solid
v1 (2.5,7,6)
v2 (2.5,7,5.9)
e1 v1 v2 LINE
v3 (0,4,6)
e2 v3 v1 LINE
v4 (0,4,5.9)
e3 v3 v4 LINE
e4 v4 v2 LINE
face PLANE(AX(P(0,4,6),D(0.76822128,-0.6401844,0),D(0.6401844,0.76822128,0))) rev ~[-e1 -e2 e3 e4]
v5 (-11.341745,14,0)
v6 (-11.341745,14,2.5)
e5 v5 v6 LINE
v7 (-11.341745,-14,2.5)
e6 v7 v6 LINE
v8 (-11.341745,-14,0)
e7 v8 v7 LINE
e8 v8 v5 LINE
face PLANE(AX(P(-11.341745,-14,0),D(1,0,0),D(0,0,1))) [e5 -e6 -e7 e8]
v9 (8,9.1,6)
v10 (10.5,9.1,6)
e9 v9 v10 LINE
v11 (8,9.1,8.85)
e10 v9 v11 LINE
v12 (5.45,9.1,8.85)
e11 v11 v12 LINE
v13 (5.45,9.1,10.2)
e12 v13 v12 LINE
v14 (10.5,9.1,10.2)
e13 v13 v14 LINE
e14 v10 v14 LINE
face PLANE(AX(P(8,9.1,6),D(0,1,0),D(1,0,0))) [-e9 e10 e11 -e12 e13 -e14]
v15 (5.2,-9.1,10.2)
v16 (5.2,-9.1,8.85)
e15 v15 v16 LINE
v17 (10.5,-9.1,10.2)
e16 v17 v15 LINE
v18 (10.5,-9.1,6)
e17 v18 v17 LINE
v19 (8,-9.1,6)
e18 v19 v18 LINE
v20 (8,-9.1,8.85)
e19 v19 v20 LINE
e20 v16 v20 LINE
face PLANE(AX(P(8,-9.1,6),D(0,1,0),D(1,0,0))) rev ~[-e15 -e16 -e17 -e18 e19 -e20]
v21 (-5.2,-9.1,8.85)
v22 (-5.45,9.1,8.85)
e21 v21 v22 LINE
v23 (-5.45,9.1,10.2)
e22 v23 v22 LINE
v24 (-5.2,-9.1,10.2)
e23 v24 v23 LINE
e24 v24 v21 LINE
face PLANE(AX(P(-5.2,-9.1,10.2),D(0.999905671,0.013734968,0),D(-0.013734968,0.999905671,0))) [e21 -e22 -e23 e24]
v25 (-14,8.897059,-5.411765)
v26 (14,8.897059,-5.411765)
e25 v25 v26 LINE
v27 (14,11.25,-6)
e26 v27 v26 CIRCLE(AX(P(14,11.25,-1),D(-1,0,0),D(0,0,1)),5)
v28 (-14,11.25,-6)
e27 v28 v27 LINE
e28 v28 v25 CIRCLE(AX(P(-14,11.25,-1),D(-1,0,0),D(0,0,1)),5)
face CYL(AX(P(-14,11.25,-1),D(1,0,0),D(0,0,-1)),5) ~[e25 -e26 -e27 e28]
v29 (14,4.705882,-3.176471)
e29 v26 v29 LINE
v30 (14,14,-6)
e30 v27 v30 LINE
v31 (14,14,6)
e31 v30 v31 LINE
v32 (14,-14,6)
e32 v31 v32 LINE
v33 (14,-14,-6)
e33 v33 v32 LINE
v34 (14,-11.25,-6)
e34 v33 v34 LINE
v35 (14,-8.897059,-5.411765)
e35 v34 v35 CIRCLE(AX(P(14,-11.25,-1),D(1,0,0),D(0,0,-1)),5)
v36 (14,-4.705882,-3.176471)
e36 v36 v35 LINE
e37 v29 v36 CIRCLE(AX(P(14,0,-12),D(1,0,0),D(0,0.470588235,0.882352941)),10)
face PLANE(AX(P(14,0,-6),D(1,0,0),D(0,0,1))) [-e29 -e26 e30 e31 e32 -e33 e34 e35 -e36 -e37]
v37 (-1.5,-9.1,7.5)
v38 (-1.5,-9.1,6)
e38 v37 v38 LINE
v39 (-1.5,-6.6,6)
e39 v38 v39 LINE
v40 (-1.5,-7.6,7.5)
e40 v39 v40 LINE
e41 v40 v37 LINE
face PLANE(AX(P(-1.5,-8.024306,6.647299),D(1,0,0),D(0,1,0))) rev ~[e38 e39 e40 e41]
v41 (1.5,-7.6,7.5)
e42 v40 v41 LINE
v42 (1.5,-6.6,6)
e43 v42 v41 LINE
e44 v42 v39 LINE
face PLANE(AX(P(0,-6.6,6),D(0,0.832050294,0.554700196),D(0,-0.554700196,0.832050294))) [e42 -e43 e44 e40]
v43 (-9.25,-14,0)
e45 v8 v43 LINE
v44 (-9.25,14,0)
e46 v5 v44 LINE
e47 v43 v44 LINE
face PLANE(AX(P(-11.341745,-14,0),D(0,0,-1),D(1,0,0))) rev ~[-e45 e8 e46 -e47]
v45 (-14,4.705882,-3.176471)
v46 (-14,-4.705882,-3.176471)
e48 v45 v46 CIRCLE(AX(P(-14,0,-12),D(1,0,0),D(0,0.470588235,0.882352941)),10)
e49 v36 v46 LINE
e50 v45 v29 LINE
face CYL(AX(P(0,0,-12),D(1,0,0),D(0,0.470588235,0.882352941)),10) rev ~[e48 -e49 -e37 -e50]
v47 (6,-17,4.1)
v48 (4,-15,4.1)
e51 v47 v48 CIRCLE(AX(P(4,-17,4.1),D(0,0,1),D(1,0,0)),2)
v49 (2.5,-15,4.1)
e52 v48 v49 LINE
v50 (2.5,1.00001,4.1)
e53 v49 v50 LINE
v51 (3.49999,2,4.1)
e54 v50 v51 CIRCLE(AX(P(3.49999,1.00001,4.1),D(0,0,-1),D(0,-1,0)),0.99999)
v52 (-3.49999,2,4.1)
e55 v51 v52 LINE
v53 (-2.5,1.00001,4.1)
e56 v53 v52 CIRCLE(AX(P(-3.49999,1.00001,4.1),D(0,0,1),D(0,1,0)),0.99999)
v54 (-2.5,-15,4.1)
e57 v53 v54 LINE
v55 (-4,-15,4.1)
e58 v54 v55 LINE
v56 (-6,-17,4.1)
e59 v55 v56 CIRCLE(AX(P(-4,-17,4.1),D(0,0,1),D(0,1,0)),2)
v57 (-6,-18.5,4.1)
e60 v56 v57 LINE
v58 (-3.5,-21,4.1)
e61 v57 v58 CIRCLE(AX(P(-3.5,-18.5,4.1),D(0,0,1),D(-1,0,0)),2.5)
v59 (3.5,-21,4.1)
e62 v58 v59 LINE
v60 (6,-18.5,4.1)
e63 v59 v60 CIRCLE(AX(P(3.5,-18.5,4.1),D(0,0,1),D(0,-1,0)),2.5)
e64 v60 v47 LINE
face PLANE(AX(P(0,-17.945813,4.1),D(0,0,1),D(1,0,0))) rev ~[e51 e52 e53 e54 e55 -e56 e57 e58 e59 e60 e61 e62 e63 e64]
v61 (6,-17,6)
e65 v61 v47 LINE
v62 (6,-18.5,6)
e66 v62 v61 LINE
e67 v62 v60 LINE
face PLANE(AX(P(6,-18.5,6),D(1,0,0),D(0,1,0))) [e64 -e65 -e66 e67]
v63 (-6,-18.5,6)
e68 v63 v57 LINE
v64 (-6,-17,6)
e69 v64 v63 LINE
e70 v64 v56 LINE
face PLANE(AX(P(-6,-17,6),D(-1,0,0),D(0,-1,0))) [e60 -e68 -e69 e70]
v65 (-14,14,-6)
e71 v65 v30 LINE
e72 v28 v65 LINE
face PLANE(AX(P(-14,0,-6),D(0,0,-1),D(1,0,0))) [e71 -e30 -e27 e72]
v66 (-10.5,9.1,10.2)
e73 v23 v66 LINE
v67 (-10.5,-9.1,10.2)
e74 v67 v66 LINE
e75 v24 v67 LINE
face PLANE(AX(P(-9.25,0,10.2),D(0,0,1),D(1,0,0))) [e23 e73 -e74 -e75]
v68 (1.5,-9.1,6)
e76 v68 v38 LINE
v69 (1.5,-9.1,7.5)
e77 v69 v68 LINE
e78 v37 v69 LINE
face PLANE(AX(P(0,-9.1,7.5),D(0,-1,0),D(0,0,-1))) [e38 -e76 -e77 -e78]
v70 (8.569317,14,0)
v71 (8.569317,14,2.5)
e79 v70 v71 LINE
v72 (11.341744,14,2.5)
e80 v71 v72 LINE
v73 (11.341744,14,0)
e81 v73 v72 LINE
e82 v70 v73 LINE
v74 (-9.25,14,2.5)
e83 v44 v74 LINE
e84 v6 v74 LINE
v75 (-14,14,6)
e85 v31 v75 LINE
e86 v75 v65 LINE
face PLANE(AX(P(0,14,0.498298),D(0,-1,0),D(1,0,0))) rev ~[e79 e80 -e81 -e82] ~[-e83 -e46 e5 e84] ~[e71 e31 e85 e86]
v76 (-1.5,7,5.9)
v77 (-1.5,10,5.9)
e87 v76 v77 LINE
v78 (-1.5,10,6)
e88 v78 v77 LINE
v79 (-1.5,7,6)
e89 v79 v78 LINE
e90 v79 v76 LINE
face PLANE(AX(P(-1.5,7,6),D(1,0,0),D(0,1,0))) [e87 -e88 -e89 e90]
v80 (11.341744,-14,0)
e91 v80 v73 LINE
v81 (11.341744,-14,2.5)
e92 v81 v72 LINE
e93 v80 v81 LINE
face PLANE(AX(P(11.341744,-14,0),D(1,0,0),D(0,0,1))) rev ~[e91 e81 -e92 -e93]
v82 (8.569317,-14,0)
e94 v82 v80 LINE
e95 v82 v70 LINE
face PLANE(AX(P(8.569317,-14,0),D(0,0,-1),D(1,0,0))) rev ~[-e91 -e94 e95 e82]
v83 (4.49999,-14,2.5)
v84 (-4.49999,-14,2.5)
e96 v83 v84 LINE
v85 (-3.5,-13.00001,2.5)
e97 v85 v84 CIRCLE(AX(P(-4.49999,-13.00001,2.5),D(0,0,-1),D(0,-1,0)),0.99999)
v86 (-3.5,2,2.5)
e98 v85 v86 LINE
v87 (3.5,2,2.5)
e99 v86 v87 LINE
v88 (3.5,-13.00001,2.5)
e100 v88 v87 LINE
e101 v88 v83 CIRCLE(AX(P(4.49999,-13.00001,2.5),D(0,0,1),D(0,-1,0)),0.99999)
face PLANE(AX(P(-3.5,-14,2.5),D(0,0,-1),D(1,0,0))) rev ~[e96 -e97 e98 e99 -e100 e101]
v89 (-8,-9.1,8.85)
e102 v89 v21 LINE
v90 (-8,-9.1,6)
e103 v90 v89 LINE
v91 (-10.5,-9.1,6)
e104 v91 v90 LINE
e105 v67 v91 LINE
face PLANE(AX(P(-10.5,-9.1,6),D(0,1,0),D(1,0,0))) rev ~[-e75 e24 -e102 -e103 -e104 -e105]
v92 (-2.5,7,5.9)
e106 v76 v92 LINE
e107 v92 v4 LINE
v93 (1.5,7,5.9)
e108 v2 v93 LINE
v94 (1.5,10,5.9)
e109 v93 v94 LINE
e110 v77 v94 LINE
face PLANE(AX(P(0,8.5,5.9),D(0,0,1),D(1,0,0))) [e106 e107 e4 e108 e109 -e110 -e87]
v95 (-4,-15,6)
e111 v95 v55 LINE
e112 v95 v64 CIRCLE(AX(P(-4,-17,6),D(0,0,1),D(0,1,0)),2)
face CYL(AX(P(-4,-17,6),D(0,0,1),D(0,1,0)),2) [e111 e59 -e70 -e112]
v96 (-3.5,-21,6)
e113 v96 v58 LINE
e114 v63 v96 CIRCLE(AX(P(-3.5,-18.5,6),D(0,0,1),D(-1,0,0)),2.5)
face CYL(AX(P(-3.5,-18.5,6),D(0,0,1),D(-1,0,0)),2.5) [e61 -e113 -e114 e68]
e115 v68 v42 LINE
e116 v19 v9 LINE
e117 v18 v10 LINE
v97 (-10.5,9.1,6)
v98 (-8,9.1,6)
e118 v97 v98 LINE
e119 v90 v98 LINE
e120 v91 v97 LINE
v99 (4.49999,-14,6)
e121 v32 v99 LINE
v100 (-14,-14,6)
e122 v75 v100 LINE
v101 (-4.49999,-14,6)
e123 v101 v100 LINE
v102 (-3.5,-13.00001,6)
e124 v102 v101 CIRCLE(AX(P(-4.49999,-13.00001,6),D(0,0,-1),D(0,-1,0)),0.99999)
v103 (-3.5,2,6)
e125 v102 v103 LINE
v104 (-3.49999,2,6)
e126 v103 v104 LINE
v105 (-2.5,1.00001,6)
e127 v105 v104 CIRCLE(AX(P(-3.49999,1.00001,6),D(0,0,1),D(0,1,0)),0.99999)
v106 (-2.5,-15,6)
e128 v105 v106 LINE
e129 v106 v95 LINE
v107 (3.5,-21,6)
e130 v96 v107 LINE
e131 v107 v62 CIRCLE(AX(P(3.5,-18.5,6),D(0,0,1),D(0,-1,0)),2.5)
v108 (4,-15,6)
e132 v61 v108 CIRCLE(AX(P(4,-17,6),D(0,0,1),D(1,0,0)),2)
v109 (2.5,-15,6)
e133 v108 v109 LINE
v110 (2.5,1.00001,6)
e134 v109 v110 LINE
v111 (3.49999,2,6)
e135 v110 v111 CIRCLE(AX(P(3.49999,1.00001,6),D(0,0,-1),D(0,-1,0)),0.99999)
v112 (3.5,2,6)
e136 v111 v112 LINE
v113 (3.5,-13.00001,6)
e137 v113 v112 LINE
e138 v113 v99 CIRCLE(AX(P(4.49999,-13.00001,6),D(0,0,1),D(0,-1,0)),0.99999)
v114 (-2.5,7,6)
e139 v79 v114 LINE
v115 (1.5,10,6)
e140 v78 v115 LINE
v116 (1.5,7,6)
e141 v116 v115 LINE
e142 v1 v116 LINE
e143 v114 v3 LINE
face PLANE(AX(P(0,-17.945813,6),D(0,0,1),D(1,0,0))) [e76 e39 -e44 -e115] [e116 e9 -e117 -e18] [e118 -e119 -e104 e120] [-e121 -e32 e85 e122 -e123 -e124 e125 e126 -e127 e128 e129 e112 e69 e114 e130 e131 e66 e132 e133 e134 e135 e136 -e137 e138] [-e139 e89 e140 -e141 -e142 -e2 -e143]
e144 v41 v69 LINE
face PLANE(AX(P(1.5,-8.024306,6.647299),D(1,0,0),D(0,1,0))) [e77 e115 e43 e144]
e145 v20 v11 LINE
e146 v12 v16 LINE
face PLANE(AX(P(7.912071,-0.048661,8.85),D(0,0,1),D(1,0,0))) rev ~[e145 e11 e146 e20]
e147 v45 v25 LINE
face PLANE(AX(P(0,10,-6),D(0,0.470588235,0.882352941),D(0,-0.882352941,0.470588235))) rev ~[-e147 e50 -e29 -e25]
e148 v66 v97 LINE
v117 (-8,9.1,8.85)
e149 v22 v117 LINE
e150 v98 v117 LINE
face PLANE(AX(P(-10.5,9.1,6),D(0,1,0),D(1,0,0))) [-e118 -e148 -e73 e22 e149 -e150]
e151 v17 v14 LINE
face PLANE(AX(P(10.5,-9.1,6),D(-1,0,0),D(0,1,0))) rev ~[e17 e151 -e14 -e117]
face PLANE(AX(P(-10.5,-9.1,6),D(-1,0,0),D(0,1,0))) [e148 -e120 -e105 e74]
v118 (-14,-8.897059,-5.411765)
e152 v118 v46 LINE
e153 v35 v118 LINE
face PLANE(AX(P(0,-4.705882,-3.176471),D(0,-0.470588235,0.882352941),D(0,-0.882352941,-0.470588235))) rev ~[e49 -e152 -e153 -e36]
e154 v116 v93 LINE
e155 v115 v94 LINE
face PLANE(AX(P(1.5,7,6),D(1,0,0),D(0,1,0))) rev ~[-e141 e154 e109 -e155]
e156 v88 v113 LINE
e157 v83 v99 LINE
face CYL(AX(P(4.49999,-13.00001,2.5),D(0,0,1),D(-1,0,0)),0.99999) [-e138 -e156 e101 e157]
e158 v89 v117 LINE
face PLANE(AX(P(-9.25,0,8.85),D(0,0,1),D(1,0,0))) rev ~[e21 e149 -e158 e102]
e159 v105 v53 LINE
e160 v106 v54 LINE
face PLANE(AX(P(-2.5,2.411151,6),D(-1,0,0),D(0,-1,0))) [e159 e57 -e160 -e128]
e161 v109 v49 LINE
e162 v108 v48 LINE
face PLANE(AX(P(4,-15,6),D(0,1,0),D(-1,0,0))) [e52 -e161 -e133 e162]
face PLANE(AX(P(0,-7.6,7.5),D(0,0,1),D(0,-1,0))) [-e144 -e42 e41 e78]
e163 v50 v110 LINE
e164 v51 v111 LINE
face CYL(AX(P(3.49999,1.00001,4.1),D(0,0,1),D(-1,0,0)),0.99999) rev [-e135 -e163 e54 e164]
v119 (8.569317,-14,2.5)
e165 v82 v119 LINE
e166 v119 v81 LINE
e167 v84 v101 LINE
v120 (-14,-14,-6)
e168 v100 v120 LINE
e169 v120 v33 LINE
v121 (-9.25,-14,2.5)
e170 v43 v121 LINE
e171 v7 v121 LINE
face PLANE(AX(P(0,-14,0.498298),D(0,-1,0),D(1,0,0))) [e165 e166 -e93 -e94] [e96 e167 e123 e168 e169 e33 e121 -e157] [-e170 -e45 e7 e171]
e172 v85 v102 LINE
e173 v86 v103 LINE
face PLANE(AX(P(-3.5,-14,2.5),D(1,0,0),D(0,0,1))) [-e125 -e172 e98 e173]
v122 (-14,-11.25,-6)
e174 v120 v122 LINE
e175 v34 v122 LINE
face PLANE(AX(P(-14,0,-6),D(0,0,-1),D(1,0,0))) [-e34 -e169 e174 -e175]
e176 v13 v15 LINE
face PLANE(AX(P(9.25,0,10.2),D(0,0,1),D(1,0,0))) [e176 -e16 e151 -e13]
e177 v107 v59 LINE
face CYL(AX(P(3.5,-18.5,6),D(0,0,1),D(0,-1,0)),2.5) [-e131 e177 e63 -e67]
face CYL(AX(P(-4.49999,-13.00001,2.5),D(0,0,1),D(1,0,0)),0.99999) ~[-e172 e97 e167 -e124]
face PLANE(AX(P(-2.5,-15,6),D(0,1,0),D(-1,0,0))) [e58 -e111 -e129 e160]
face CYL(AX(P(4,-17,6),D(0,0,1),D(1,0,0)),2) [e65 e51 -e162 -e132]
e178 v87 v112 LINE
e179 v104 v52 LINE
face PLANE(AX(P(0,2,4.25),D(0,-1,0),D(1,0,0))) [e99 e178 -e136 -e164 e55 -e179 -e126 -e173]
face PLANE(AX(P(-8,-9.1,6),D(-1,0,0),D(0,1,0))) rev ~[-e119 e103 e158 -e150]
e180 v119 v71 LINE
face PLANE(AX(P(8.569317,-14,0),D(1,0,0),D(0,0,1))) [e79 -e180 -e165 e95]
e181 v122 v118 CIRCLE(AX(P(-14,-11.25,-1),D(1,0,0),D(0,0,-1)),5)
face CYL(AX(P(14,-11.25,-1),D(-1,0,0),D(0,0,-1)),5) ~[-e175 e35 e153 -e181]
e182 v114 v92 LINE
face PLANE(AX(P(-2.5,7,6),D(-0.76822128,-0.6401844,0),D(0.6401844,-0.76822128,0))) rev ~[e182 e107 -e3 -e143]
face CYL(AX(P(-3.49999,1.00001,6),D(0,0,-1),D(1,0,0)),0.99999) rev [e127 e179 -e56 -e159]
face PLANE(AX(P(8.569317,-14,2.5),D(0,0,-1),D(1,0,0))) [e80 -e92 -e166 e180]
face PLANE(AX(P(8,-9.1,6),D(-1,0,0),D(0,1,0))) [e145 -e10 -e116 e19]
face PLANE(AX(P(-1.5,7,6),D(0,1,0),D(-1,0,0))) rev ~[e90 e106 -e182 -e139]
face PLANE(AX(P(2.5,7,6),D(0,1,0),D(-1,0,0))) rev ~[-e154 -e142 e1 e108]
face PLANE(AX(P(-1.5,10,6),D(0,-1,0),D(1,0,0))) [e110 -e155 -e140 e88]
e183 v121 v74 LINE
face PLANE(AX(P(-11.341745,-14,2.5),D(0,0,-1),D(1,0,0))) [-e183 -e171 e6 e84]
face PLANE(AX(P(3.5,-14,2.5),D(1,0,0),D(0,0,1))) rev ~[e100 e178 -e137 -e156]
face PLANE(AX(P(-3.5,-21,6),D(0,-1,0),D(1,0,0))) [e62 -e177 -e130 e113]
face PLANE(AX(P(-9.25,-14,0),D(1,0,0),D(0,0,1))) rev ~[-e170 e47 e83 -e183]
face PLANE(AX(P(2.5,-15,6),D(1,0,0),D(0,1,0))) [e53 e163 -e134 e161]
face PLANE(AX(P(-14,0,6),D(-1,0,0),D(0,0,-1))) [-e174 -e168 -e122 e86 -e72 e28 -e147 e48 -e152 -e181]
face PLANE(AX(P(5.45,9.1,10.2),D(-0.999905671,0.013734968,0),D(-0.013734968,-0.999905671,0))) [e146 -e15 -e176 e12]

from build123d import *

# Parameters (mm, degrees)
F1_DEPTH  = 14
F3_W      = 7
F3_H      = 3.5
F4_DEPTH  = 16
F5_W      = 5
F5_H      = 0.4111507442
F5_H_2    = 17
F6_DEPTH  = 1.9
F8_R      = 0.99999
F10_DEPTH = 1.5
F11_W     = 2.5
F11_H     = 18.2
F12_DEPTH = 4.2
F13_W     = 2.5
F13_H     = 18.2
F14_DEPTH = 1.35
F15_W     = 3
F15_H     = 3
F16_DEPTH = 0.1
F17_DEPTH = 15
F18_R     = 5
F19_W     = 2.0917450339
F19_H     = 2.5
F20_DEPTH = 28.001
F19_W_2   = 2.772427164
F21_DEPTH = 28.001


# Not quite as in the source:
# - a fillet or chamfer is up to 0.001 mm smaller than in the source, because OpenCascade refuses the exact size
# - the program builds the solid bodies; features that only make, move or delete a surface that nothing else refers to are left out


with BuildPart() as f1:
    # F0 (on Front) → F1 (new body, symmetric)
    with BuildSketch(Plane.XZ):
        with BuildLine():
            Line((10, -6), (14, -6))
            Line((14, -6), (14, 6))
            Line((14, 6), (-14, 6))
            Line((-14, 6), (-14, -6))
            Line((-14, -6), (-10, -6))
            Line((-10, -6), (-4.7058823529, -3.1764705882))
            ThreePointArc((-4.7058823529, -3.1764705882), (0, -2), (4.7058823529, -3.1764705882))
            Line((4.7058823529, -3.1764705882), (10, -6))
        make_face()
        with BuildLine():
            Line((-10, -6), (10, -6))
            Line((10, -6), (4.7058823529, -3.1764705882))
            ThreePointArc((4.7058823529, -3.1764705882), (0, -2), (-4.7058823529, -3.1764705882))
            Line((-4.7058823529, -3.1764705882), (-10, -6))
        make_face()
    extrude(amount=F1_DEPTH, both=True)

    # F3 (on face) → F4 (cut)
    with BuildSketch(Plane.XZ.offset(14)):
        with Locations((0, 4.25)):
            Rectangle(F3_W, F3_H)
    extrude(amount=-F4_DEPTH, mode=Mode.SUBTRACT)

    # F5 (on face) → F6 (join)
    with BuildSketch(Plane.XY.offset(6)):
        with BuildLine():
            Line((2.5, -15), (-2.5, -15))
            Line((-2.5, -15), (-4, -15))
            ThreePointArc((-4, -15), (-5.4142135624, -15.5857864376), (-6, -17))
            Line((-6, -17), (-6, -18.5))
            ThreePointArc((-6, -18.5), (-5.267766953, -20.267766953), (-3.5, -21))
            Line((-3.5, -21), (3.5, -21))
            ThreePointArc((3.5, -21), (5.267766953, -20.267766953), (6, -18.5))
            Line((6, -18.5), (6, -17))
            ThreePointArc((6, -17), (5.4142135624, -15.5857864376), (4, -15))
            Line((4, -15), (2.5, -15))
        make_face()
        with Locations((0, 2.2055753721)):
            Rectangle(F5_W, F5_H)
        with Locations((0, -6.5)):
            Rectangle(F5_W, F5_H_2)
    extrude(amount=-F6_DEPTH)

    # F7: union 

    # F8 (radius 1 in the source; OpenCascade refuses exactly that, so slightly less here)
    f8_edges = [f1.edges().sort_by_distance(p)[0] for p in [
        (-3.5, -14, 4.25),
        (3.5, -14, 4.25),
        (2.5, 2, 5.05),
        (-2.5, 2, 5.05),
    ]]
    fillet(f8_edges, radius=F8_R)

    # F9 (on Right) → F10 (join, symmetric)
    with BuildSketch(Plane.YZ):
        Polygon((-6.6, 6), (-7.6, 7.5), (-9.1, 7.5), (-9.1, 6), align=None)
    extrude(amount=F10_DEPTH, both=True)

    # F11 (on face) → F12 (join)
    with BuildSketch(Plane.XY.offset(6)):
        with Locations((-9.25, 0)):
            Rectangle(F11_W, F11_H)
        with Locations((9.25, 0)):
            Rectangle(F11_W, F11_H)
    extrude(amount=F12_DEPTH)

    # F13 (on face) → F14 (join)
    with BuildSketch(Plane.XY.offset(10.2)):
        with Locations((-9.25, 0)):
            Rectangle(F13_W, F13_H)
        Polygon((-5.45, 9.1), (-8, 9.1), (-8, -9.1), (-5.2, -9.1), align=None)
        Polygon((5.45, 9.1), (5.2, -9.1), (10.5, -9.1), (10.5, 9.1), align=None)
    extrude(amount=-F14_DEPTH)

    # F15 (on face) → F16 (cut)
    with BuildSketch(Plane.XY.offset(6)):
        with Locations((0, 8.5)):
            Rectangle(F15_W, F15_H)
        Polygon((2.5, 7), (1.5, 7), (-1.5, 7), (-2.5, 7), (0, 4), align=None)
    extrude(amount=-F16_DEPTH, mode=Mode.SUBTRACT)

    # F2 (on Right) → F17 (cut, symmetric)
    with BuildSketch(Plane.YZ):
        with BuildLine():
            Line((-10, -6), (10, -6))
            Line((10, -6), (4.7058823529, -3.1764705882))
            ThreePointArc((4.7058823529, -3.1764705882), (0, -2), (-4.7058823529, -3.1764705882))
            Line((-4.7058823529, -3.1764705882), (-10, -6))
        make_face()
    extrude(amount=F17_DEPTH, both=True, mode=Mode.SUBTRACT)

    # F18
    f18_edges = [f1.edges().sort_by_distance(p)[0] for p in [
        (0, -10, -6),
        (0, 10, -6),
    ]]
    fillet(f18_edges, radius=F18_R)

    # F19 (on face) → F20 (cut, through all)
    with BuildSketch(Plane.XZ.offset(14)):
        with Locations((-10.2958725169, 1.25)):
            Rectangle(F19_W, F19_H)
    extrude(amount=-F20_DEPTH, mode=Mode.SUBTRACT)

    # F19 (on face) → F21 (cut, through all)
    with BuildSketch(Plane.XZ.offset(14)):
        with Locations((-10.2958725169, 1.25)):
            Rectangle(F19_W, F19_H)
        with Locations((9.9555305205, 1.25)):
            Rectangle(F19_W_2, F19_H)
    extrude(amount=-F21_DEPTH, mode=Mode.SUBTRACT)


solid = f1.part
